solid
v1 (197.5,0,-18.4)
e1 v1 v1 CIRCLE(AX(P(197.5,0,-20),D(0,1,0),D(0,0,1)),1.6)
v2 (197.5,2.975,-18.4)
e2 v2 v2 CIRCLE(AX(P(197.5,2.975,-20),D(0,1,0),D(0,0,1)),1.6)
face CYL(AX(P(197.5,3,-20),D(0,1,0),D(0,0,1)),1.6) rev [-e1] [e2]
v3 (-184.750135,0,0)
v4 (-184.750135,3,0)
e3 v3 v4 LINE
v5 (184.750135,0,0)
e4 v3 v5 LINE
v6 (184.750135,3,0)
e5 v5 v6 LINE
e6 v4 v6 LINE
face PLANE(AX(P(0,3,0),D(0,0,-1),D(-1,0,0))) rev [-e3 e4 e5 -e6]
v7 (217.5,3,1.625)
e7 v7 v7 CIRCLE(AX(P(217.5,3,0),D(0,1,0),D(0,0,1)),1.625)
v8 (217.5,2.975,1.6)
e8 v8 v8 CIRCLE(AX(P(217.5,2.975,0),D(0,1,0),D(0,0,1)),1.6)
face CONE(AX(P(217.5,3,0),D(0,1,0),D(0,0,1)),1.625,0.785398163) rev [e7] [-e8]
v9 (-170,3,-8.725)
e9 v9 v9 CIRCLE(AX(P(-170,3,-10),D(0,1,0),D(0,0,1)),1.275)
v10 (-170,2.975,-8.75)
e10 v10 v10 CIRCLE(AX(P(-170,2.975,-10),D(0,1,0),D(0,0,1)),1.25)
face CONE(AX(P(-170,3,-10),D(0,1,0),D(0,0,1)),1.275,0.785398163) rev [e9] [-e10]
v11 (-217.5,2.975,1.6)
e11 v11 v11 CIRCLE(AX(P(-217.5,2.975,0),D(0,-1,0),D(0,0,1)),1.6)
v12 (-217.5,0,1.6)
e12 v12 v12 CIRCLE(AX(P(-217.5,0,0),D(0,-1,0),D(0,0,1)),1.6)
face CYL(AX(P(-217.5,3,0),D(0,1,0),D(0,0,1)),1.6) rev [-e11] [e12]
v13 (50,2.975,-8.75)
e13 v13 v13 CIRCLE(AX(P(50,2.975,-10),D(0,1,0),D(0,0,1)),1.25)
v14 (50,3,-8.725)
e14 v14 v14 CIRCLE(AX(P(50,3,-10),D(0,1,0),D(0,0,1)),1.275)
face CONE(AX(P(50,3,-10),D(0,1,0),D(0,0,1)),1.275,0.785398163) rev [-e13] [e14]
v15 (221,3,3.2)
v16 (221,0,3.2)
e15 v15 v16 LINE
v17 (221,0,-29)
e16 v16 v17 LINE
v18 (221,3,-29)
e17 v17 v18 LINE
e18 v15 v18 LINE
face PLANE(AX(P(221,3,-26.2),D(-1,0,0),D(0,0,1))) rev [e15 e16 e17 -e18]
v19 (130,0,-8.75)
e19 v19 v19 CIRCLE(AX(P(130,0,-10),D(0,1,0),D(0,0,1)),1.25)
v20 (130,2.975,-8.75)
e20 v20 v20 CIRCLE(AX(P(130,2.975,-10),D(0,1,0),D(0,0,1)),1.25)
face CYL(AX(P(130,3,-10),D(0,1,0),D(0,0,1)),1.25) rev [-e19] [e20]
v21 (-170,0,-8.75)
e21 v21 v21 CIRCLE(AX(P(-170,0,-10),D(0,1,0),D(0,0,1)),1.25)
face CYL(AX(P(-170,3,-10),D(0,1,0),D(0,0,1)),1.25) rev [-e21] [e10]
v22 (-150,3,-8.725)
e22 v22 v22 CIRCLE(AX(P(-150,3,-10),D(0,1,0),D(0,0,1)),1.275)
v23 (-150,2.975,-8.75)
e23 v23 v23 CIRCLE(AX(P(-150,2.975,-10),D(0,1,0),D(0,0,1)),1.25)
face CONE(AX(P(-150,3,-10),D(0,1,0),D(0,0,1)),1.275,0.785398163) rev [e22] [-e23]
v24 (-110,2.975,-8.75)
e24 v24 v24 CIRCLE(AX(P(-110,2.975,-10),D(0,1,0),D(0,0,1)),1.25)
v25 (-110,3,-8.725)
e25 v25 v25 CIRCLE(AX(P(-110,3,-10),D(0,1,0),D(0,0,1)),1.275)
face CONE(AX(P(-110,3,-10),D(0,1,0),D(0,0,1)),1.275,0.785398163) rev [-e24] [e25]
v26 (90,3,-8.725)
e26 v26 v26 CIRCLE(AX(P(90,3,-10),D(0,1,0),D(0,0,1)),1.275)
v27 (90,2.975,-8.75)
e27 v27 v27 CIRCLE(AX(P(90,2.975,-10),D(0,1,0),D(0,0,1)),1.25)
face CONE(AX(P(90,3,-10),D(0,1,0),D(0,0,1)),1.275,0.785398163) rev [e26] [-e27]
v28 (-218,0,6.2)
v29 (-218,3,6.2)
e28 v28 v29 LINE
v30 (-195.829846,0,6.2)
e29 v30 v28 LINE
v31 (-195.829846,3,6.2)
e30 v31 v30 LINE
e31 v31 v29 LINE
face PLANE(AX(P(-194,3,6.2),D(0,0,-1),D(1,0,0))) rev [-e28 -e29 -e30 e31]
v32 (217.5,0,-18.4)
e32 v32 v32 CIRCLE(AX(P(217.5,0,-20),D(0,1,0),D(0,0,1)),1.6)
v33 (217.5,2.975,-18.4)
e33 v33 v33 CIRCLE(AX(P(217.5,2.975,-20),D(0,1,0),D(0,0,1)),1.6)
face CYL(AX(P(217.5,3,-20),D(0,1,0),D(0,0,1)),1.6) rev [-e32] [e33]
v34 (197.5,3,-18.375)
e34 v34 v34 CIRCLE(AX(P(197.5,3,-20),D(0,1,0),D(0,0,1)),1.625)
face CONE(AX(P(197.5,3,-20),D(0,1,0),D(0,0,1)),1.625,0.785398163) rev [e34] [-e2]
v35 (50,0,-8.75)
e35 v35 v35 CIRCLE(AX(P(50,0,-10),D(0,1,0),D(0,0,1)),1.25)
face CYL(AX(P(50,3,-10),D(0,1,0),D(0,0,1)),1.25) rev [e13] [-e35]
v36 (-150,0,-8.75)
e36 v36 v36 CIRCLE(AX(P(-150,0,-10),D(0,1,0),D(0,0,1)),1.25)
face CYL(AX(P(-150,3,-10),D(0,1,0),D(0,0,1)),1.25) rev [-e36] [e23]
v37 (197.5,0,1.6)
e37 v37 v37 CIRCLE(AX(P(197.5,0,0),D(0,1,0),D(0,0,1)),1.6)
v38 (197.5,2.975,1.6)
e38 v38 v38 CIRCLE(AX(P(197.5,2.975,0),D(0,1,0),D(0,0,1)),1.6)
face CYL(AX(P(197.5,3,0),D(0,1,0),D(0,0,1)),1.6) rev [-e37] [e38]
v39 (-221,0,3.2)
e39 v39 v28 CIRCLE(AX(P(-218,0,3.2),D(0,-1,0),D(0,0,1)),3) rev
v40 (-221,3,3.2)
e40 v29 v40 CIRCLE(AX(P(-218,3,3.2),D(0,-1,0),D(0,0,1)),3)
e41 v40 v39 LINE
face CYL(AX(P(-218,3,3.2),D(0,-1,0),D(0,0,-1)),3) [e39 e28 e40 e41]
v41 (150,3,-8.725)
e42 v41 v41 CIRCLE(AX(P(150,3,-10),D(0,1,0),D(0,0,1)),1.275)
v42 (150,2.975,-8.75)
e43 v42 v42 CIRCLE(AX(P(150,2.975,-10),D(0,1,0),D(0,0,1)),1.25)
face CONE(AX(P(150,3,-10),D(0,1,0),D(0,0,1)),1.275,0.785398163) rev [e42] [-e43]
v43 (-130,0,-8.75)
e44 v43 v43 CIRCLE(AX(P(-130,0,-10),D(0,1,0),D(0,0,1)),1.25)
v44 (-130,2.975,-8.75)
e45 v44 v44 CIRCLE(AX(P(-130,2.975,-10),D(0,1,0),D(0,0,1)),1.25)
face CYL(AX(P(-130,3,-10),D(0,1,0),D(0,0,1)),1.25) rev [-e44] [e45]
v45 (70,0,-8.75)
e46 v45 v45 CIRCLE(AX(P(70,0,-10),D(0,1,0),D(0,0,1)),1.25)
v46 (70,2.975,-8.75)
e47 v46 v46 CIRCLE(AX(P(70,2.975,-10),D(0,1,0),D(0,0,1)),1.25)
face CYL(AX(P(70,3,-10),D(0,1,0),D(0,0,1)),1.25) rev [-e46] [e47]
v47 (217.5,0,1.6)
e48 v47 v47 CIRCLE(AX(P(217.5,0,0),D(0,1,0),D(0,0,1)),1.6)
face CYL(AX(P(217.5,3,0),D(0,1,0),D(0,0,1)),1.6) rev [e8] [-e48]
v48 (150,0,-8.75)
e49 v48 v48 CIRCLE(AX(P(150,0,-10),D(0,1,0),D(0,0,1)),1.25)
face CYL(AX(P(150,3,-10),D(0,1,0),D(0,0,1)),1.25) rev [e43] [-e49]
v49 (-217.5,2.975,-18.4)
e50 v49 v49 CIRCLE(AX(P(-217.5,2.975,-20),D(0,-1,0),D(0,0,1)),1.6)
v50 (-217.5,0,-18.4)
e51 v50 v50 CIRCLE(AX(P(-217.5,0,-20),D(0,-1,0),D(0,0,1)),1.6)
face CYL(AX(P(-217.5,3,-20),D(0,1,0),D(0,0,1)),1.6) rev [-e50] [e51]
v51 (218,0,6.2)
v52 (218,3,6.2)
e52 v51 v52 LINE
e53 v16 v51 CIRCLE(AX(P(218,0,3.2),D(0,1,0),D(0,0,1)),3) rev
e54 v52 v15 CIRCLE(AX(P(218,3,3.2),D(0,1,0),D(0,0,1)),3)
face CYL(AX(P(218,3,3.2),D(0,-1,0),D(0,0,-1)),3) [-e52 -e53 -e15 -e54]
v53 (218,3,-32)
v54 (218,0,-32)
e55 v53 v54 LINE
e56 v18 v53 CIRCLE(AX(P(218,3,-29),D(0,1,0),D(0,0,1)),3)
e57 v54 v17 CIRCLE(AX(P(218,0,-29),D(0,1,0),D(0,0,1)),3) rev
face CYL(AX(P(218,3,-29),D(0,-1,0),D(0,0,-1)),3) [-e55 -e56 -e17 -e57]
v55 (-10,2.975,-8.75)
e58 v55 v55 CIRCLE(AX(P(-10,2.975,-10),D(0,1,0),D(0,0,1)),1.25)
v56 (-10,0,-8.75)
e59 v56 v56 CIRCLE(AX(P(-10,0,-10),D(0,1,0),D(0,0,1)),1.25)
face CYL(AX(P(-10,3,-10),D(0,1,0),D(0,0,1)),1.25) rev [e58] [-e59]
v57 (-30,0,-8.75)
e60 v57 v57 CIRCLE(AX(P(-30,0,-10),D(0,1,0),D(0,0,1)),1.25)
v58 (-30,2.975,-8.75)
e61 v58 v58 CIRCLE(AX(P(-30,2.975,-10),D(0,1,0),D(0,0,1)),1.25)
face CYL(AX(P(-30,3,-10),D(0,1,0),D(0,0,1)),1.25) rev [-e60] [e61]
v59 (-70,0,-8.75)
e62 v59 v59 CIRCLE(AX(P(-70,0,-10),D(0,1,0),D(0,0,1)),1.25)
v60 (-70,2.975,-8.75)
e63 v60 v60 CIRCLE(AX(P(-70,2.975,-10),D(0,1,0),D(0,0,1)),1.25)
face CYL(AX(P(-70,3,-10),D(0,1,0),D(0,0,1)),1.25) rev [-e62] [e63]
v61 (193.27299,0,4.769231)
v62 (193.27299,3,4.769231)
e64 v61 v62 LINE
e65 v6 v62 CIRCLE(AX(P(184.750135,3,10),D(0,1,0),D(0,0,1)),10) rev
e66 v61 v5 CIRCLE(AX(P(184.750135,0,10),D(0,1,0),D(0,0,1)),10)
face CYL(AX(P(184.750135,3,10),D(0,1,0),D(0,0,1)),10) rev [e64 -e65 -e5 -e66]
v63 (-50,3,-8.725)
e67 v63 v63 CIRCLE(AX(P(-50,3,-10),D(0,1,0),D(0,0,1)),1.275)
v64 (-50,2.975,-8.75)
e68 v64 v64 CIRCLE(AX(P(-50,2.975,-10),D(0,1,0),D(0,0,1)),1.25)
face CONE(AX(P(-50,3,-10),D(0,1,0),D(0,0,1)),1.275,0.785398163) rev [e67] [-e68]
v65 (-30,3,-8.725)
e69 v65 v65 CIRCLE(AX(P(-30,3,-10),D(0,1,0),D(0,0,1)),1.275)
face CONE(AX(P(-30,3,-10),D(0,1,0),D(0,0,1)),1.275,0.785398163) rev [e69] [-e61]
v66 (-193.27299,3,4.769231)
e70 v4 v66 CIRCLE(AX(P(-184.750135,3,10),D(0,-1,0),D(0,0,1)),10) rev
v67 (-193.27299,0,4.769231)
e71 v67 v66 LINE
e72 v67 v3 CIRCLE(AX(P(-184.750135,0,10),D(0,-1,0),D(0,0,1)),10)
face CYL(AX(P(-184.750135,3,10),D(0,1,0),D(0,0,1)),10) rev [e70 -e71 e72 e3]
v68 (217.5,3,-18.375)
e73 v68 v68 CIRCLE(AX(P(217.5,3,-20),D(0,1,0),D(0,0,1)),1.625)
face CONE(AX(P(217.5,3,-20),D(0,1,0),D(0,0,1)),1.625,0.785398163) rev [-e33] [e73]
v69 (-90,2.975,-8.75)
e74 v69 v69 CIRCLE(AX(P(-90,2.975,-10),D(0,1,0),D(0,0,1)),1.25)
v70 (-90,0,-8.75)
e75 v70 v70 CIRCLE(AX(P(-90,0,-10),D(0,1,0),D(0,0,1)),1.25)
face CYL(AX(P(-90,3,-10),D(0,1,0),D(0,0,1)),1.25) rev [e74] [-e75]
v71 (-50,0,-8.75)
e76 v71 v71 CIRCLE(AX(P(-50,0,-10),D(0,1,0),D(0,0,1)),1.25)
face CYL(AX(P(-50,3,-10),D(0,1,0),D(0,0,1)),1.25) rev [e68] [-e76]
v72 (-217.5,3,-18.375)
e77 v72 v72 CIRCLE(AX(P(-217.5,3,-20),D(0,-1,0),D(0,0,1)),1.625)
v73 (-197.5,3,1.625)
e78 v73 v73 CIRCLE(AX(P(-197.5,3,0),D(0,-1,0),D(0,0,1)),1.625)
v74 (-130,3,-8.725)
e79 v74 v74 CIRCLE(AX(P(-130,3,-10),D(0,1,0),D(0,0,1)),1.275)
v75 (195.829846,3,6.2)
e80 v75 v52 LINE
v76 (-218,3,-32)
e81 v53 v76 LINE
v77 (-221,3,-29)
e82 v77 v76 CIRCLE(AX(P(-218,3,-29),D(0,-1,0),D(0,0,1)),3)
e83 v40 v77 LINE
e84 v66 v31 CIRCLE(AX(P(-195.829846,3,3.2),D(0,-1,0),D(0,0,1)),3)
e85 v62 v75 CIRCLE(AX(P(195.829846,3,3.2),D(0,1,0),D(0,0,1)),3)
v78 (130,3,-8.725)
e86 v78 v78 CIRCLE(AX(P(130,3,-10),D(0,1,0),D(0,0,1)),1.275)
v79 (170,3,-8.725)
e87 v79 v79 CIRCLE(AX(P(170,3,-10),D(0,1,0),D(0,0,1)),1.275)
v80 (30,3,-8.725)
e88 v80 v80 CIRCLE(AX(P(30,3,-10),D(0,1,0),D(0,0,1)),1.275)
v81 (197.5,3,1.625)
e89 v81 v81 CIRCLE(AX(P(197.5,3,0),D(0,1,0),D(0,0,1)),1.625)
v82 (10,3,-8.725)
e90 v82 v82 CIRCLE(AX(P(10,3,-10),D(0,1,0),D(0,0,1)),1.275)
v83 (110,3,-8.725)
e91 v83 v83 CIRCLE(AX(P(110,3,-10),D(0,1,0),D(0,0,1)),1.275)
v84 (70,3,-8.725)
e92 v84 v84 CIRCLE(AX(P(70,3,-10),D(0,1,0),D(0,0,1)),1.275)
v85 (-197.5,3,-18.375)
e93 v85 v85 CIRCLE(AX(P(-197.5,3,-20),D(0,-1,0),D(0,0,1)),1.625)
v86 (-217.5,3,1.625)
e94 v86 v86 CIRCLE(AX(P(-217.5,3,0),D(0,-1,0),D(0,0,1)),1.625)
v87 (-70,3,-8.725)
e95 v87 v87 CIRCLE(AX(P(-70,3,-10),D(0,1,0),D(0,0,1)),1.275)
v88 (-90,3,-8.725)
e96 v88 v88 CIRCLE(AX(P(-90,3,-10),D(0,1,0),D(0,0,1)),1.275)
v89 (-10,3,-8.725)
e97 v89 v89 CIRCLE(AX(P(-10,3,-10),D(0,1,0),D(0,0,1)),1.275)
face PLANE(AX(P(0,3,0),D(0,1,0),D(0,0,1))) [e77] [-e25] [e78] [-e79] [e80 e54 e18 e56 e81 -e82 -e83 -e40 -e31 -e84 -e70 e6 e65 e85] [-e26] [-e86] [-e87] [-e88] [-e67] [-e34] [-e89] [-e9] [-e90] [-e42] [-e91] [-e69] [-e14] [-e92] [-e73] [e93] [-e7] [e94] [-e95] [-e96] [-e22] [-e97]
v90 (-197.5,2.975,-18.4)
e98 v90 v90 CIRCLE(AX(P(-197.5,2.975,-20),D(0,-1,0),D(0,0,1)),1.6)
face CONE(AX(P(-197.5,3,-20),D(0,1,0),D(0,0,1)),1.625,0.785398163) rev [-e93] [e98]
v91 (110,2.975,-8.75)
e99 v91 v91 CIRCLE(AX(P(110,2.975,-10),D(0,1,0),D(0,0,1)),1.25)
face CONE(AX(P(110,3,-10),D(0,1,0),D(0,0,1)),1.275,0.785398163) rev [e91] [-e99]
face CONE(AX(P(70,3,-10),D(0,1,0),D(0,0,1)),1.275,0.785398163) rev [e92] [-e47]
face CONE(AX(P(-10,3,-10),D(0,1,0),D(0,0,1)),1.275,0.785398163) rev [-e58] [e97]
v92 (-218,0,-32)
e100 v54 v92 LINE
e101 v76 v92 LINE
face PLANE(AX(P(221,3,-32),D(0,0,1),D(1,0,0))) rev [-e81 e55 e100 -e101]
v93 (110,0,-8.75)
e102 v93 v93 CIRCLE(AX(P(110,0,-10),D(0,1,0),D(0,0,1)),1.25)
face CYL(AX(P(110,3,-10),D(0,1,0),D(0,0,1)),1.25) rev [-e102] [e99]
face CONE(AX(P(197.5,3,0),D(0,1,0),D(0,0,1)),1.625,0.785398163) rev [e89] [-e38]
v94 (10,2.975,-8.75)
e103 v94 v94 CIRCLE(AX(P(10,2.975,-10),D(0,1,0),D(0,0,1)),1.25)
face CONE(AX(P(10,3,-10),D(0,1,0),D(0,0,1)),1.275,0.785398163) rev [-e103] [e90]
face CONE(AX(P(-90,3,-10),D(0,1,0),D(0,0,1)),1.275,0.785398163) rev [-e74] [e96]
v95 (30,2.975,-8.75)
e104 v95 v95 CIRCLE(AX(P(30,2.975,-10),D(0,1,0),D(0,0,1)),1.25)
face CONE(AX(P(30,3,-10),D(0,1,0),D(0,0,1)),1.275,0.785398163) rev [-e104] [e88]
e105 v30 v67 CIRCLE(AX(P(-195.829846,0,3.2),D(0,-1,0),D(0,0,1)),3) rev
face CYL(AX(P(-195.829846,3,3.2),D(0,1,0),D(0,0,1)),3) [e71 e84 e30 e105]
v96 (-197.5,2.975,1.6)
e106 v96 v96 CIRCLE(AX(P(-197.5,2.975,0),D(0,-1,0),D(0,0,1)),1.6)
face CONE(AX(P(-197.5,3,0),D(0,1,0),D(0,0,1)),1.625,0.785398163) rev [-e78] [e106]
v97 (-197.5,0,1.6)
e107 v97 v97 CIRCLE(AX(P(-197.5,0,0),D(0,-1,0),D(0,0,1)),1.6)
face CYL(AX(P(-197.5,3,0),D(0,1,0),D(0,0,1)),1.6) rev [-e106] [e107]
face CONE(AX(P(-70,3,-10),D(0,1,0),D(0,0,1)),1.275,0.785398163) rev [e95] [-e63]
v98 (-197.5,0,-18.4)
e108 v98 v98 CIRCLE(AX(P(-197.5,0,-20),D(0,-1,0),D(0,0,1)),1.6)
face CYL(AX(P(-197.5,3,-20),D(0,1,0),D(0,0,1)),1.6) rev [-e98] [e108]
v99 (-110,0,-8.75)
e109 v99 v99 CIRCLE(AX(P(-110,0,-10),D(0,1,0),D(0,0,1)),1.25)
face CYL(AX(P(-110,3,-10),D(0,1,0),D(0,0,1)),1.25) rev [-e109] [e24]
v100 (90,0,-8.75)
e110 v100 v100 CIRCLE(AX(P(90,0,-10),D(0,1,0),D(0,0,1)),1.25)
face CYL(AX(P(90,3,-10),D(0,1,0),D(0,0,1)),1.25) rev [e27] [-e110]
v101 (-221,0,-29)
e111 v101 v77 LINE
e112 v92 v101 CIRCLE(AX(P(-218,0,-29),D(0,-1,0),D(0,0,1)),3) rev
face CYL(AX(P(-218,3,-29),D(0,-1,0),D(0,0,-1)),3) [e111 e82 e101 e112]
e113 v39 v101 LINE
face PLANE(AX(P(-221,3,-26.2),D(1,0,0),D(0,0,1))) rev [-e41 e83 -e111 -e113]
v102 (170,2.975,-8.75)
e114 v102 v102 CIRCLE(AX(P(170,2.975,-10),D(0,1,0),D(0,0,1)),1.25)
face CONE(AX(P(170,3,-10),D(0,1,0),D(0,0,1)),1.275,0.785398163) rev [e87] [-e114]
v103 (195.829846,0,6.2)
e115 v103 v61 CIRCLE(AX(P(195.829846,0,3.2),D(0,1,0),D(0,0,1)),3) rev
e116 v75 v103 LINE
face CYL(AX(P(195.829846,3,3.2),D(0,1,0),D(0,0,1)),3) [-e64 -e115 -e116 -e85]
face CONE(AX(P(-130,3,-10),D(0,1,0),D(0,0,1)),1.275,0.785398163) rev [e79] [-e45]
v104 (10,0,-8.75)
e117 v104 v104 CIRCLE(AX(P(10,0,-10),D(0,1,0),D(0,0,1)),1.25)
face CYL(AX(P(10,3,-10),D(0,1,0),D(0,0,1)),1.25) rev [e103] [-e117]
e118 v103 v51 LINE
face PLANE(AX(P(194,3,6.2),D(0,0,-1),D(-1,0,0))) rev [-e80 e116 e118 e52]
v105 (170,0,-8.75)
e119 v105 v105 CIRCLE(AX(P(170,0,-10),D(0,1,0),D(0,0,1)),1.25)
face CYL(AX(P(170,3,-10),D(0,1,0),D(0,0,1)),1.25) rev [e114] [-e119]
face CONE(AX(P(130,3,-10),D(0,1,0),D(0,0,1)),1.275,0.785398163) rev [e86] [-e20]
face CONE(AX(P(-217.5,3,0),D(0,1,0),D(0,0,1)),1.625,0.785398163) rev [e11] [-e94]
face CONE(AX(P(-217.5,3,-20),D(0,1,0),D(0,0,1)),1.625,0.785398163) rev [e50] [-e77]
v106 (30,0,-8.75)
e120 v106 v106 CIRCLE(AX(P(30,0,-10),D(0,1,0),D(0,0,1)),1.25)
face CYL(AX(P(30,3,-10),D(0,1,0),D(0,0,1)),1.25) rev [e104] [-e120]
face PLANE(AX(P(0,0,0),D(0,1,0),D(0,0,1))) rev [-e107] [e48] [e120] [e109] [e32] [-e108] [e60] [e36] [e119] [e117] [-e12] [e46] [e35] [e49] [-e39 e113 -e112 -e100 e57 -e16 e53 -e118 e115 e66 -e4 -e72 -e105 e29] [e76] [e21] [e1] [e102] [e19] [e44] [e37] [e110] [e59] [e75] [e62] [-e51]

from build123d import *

# Parameters (mm, degrees)
BOSS_EXTRUDE1_DEPTH                   = 3
M3_CLEARANCE_HOLE1_D                  = 3.2
M3_CLEARANCE_HOLE1_CSINK_D            = 3.25
M3_CLEARANCE_HOLE1_CSINK_ANGLE        = 90
FILLET1_R                             = 10
FILLET2_R                             = 3
TAP_DRILL_FOR_M3X0_5_TAP1_D           = 2.5
TAP_DRILL_FOR_M3X0_5_TAP1_CSINK_D     = 2.55
TAP_DRILL_FOR_M3X0_5_TAP1_CSINK_ANGLE = 90


with BuildPart() as part:
    # Sketch1 → Boss-Extrude1 (new body)
    with BuildSketch(Plane(origin=(0, 0, 0), x_dir=(1, 0, 0), z_dir=(0, 1, 0))):
        Polygon((0, 0), (194, 0), (194, -6.2), (221, -6.2), (221, 26.2), (221, 32), (0, 32), (0, 26.2), align=None)
    extrude(amount=BOSS_EXTRUDE1_DEPTH)

    # M3 Clearance Hole1 (through all)
    with Locations(Plane(origin=(0, 3, 0), x_dir=(1, 0, 0), z_dir=(0, 1, 0))):
        with Locations((197.5, 20), (217.5, 0), (217.5, 20), (197.5, 0)):
            CounterSinkHole(M3_CLEARANCE_HOLE1_D / 2, M3_CLEARANCE_HOLE1_CSINK_D / 2, counter_sink_angle=M3_CLEARANCE_HOLE1_CSINK_ANGLE)

    # Fillet1
    # the kernel refuses this fillet: 10 mm, written as the material it adds along each edge
    with BuildSketch(Plane(origin=(194, 0, 0), x_dir=(-1, 0, 0), z_dir=(0, 1, 0))) as fillet1_piece_1:
        with BuildLine():
            CenterArc((9.249864864, 10), FILLET1_R, 202.333682658, 67.666317342)
            Line((0, 6.2), (-0.184997297, 6.124))
            ThreePointArc((-0.184997297, 6.124), (-0.2, 3.1), (-0.2, 0))
            Line((-0.2, 0), (0, -0.2))
            Line((0, -0.2), (9.249864864, -0.2))
            Line((9.249864864, -0.2), (9.249864864, 0))
        make_face()
    extrude(amount=3)

    # Fillet2
    fillet2_edges = [part.edges().sort_by_distance(p)[0] for p in [
        (221, 1.5, -32),
        (221, 1.5, 6.2),
        (194, 1.5, 6.2),
    ]]
    fillet(fillet2_edges, radius=FILLET2_R)

    # Mirror1: part across plane


with BuildPart() as part_1:
    add(part.part)
    add(part.part.mirror(Plane(origin=(0, 3, -32), x_dir=(0, 0, 1), z_dir=(1, 0, 0))))

    # Tap Drill for M3x0.5 Tap1 (through all)
    with Locations(Plane(origin=(0, 3, 0), x_dir=(1, 0, 0), z_dir=(0, 1, 0))):
        with Locations((-170, 10), (-150, 10), (-130, 10), (-110, 10), (-90, 10), (-70, 10), (-50, 10), (-30, 10), (-10, 10), (10, 10), (30, 10), (50, 10), (70, 10), (170, 10), (150, 10), (130, 10), (110, 10), (90, 10)):
            CounterSinkHole(TAP_DRILL_FOR_M3X0_5_TAP1_D / 2, TAP_DRILL_FOR_M3X0_5_TAP1_CSINK_D / 2, counter_sink_angle=TAP_DRILL_FOR_M3X0_5_TAP1_CSINK_ANGLE)


solid = part_1.part
